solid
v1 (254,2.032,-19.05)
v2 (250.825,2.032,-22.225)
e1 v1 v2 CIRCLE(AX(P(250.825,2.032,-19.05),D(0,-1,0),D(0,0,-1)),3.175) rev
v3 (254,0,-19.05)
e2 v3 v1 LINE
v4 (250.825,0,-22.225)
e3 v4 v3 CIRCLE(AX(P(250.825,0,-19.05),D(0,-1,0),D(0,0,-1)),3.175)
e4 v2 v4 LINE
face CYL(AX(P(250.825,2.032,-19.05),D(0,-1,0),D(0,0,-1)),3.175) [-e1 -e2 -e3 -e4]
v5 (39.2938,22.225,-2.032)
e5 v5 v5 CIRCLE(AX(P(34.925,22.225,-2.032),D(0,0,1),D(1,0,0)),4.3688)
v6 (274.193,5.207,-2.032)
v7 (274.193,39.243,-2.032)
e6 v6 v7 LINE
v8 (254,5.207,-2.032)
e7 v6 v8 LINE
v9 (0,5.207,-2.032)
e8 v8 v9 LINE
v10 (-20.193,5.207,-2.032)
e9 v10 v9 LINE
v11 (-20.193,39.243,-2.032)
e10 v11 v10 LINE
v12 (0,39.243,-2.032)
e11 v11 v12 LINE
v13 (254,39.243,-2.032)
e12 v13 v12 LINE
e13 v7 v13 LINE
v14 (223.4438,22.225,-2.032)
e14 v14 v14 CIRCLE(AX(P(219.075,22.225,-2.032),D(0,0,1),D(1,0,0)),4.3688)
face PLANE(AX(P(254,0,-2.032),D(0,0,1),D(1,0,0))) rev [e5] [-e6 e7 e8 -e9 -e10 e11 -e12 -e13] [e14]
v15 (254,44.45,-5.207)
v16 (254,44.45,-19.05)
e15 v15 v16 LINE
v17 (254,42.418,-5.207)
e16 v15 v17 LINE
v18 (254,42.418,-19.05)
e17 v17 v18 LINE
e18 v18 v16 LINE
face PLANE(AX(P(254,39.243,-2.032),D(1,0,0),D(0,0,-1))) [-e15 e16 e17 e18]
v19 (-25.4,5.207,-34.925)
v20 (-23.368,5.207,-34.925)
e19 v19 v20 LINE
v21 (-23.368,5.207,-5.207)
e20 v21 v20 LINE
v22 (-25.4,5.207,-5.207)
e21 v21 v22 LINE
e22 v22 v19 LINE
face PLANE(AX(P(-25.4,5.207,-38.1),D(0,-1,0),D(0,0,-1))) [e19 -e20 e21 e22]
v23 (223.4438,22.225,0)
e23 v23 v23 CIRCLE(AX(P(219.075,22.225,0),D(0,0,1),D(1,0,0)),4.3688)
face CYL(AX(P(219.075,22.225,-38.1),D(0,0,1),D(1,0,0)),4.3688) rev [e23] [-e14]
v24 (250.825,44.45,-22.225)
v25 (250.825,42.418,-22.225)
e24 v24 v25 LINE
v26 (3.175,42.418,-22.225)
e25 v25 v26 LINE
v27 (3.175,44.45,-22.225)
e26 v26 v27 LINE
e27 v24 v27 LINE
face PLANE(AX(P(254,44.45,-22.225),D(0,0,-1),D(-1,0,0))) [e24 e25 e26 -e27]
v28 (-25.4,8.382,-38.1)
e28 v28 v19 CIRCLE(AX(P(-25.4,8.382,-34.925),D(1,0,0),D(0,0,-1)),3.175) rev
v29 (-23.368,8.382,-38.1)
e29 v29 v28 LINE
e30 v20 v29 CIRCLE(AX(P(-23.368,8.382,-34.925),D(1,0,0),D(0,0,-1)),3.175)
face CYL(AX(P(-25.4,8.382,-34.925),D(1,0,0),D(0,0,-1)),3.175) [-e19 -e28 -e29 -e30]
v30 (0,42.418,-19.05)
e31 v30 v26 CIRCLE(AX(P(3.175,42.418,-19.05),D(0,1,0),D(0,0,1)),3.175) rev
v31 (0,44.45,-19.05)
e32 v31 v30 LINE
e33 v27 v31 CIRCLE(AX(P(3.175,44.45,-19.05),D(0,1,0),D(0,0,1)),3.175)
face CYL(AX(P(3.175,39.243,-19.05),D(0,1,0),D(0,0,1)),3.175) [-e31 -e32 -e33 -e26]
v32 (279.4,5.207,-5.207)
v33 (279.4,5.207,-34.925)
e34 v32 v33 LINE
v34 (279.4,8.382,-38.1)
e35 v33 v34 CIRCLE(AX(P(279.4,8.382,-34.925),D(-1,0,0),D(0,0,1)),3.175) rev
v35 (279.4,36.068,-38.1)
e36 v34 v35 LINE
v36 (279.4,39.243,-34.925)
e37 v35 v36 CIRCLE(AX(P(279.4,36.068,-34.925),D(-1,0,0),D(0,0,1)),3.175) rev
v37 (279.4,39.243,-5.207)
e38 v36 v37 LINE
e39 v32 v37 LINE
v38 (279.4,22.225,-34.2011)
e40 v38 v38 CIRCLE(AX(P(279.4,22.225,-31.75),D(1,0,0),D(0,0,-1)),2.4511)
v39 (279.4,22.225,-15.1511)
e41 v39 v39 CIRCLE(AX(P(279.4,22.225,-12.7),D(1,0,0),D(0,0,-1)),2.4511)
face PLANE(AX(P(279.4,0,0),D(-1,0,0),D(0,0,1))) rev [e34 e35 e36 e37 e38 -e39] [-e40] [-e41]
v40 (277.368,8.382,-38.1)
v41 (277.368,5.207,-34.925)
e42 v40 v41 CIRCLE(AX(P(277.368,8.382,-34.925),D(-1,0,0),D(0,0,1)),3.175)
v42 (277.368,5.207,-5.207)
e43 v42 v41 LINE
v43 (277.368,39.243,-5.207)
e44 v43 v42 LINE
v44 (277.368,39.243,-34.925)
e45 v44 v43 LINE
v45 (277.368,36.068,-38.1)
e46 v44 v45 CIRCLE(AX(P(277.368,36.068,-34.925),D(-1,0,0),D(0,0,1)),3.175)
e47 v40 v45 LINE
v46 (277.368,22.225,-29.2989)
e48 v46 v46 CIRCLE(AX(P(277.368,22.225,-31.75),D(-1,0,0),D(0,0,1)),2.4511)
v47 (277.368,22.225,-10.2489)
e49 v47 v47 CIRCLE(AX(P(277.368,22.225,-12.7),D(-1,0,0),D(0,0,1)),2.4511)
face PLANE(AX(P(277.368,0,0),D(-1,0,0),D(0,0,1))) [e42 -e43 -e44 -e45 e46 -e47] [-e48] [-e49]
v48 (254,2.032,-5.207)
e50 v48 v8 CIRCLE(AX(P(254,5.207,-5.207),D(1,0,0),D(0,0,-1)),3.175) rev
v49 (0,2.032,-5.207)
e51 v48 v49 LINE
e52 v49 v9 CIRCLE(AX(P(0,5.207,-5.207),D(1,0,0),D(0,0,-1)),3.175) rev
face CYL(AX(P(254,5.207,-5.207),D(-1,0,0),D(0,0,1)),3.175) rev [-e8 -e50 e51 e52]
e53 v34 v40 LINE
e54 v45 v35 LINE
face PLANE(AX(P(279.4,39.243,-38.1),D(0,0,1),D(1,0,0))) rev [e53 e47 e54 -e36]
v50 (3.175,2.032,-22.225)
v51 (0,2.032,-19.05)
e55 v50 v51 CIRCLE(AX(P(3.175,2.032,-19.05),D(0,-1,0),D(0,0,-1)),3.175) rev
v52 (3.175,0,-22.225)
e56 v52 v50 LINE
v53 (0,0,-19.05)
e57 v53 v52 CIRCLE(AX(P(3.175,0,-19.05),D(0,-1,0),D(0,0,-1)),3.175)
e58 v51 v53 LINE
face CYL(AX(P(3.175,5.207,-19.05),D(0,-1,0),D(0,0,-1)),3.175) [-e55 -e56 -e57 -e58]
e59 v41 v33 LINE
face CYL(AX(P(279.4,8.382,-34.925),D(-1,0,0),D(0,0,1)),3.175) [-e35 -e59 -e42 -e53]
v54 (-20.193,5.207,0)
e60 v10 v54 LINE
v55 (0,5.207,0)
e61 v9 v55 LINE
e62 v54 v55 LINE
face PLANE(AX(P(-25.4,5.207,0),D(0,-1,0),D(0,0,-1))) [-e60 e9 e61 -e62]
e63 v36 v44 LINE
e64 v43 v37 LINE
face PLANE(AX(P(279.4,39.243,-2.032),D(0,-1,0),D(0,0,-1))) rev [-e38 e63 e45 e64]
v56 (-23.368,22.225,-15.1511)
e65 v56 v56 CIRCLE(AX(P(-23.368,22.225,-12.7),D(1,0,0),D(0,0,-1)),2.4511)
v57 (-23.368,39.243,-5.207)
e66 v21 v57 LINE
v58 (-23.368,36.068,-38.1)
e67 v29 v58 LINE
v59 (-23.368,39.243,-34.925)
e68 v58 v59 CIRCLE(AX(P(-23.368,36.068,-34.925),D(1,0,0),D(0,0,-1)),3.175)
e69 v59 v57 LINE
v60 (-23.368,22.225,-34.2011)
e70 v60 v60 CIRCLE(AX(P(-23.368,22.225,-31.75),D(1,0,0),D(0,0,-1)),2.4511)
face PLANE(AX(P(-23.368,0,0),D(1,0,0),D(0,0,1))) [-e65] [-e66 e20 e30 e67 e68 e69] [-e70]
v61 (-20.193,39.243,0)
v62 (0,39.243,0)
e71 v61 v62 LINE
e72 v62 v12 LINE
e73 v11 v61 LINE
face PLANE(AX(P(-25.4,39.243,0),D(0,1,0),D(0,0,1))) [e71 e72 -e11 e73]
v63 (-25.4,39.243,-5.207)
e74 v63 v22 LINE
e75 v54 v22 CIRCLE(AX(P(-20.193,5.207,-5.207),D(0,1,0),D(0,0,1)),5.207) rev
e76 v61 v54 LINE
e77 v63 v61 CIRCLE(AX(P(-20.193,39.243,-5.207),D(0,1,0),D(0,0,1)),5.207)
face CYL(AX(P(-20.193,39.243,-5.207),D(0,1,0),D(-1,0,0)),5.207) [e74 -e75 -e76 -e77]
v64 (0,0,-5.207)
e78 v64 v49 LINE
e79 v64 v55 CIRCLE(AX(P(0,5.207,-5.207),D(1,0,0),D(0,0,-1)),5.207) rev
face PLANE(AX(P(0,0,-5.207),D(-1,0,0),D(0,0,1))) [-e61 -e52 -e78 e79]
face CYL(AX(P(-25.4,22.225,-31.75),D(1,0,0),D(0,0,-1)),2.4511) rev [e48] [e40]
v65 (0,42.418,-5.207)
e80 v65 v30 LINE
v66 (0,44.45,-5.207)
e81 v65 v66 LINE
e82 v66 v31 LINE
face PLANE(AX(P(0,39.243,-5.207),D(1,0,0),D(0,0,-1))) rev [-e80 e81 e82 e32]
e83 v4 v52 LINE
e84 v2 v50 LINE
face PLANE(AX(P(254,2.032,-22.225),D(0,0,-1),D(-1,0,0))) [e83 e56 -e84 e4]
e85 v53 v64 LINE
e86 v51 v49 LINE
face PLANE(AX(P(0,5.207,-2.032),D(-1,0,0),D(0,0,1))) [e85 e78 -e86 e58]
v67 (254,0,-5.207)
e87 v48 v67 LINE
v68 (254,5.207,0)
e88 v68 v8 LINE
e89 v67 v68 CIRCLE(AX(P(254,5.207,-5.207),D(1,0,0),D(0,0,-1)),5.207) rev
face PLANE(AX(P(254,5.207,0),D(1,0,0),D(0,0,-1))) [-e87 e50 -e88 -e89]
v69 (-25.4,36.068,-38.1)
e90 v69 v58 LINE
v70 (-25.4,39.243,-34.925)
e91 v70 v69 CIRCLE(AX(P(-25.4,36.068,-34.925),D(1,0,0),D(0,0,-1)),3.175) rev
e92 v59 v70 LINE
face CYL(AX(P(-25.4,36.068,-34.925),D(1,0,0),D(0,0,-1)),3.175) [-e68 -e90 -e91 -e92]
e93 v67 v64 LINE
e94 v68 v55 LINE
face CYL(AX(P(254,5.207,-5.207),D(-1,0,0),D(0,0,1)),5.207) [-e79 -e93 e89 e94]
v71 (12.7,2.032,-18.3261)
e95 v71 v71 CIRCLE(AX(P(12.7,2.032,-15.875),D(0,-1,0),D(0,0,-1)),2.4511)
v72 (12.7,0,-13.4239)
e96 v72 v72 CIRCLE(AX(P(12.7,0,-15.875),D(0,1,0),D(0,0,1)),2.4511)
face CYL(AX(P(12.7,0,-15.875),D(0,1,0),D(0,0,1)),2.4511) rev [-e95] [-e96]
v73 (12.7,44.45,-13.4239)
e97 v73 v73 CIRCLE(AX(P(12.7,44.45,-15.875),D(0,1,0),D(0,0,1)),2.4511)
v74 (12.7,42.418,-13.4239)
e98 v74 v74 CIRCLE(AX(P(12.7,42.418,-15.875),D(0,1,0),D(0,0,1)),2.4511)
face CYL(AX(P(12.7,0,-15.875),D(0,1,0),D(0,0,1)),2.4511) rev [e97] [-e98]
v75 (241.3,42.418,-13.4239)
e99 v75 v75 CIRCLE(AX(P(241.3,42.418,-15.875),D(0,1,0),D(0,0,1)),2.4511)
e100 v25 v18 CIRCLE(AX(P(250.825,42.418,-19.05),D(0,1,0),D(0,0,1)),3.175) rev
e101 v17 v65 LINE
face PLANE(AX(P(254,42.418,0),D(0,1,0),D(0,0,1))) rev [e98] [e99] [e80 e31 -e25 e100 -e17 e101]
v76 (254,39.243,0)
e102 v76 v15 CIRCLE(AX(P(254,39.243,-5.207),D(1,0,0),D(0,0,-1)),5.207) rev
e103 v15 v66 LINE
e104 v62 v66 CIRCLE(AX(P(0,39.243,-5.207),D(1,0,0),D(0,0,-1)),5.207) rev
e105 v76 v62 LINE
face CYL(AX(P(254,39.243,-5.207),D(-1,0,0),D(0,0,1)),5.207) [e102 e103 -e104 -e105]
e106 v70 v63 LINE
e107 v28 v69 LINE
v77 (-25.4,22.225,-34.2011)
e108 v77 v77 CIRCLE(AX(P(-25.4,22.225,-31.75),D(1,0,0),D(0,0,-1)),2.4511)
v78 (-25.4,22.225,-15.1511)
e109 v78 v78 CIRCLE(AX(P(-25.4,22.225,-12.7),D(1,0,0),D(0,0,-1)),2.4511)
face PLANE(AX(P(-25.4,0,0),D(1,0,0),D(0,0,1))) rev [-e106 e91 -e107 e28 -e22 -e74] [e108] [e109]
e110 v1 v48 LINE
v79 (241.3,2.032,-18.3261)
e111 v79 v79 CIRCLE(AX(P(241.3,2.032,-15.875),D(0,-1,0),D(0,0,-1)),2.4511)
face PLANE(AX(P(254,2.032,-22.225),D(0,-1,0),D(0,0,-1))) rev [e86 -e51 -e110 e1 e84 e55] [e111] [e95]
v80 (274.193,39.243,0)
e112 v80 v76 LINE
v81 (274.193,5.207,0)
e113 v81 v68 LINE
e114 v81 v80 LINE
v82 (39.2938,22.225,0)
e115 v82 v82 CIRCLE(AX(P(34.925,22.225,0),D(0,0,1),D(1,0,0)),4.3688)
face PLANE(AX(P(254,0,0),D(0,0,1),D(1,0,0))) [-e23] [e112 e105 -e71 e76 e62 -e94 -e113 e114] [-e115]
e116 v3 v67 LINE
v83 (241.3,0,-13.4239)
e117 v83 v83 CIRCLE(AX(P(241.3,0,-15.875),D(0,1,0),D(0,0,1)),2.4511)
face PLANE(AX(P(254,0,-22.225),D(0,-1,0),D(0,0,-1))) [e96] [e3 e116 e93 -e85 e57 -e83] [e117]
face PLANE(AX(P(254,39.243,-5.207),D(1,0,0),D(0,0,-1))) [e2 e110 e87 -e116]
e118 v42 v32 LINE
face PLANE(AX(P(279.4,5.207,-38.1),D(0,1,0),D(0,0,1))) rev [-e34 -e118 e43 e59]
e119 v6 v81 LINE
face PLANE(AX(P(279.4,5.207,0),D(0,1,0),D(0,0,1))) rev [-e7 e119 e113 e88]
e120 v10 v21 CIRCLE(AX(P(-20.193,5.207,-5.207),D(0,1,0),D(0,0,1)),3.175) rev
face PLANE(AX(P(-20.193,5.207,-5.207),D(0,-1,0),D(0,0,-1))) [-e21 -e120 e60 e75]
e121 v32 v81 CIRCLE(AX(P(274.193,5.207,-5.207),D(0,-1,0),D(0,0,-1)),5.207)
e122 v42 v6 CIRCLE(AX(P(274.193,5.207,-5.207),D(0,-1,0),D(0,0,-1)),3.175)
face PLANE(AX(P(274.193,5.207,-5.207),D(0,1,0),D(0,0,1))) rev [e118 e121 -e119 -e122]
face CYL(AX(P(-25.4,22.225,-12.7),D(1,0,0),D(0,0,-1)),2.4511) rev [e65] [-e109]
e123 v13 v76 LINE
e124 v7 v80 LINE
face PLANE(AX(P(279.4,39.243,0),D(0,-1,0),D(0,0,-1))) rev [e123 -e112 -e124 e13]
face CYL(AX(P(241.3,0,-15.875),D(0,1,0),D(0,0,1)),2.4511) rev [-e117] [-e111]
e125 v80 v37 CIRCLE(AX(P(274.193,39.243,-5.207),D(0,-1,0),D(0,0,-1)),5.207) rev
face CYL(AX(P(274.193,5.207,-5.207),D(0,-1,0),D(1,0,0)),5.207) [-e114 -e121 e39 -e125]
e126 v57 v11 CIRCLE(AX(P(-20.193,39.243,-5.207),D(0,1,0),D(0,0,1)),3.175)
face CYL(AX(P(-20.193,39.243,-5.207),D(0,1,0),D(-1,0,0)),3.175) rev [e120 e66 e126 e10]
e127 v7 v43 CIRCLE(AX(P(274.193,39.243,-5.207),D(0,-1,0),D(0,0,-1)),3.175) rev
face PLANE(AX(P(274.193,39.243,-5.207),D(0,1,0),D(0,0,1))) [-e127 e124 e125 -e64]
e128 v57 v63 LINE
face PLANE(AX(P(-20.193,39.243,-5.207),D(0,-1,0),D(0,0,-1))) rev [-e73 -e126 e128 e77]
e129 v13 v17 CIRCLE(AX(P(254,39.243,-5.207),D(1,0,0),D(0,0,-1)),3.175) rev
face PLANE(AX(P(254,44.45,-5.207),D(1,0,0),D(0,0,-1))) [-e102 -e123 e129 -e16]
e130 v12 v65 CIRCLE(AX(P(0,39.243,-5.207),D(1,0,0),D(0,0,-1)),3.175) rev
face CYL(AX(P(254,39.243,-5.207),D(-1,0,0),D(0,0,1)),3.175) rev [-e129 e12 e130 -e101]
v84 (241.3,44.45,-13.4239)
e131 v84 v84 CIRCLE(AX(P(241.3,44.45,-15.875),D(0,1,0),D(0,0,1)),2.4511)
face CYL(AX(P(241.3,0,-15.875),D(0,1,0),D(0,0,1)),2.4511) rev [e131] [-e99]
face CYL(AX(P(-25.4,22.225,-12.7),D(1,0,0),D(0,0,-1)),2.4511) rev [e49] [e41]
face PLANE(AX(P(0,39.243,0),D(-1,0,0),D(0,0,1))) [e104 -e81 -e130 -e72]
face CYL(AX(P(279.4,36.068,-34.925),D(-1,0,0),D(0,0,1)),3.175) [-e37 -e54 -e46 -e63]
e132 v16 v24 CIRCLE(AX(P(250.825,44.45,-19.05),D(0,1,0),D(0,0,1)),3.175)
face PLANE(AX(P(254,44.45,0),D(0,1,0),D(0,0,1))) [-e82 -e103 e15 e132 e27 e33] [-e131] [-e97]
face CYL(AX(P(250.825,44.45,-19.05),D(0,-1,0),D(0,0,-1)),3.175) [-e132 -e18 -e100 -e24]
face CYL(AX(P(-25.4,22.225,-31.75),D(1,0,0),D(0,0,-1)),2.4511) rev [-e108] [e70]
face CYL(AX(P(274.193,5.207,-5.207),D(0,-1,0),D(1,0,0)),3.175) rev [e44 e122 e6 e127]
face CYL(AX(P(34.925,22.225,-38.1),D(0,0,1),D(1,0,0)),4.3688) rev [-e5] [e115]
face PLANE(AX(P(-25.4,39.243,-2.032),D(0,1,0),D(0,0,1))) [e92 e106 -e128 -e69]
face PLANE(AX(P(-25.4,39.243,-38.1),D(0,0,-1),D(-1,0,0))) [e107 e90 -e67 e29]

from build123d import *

# Parameters (mm, degrees)
BASE_FLANGE1_DEPTH           = 254
SKETCH6_W                    = 2.032
SKETCH6_H                    = 34.036
BOSS_EXTRUDE1_DEPTH          = 25.4
EDGE_FLANGE1_STRIP_W         = 14.478
EDGE_FLANGE1_STRIP_H         = 2.032
EDGE_FLANGE1_STRIP_CUT_DEPTH = 34.036
EDGE_FLANGE1_DEPTH           = 34.036
SKETCH10_R                   = 2.4511
CUT_EXTRUDE1_DEPTH           = 311.37147501
SKETCH11_R                   = 2.4511
CUT_EXTRUDE2_DEPTH           = 286.467638271
SKETCH12_R                   = 4.3688
CUT_EXTRUDE3_DEPTH           = 286.467638271
FILLET1_R                    = 3.175


# Sheet-metal steps are written as plain solids
with BuildPart() as part:
    # Sketch1 → Base-Flange1 (new body)
    with BuildSketch(Plane(origin=(0, 0, 0), x_dir=(0, 0, -1), z_dir=(1, 0, 0))):
        with BuildLine():
            Line((22.225, 0), (5.207, 0))
            ThreePointArc((5.207, 0), (1.52509499, 1.52509499), (0, 5.207))
            Line((0, 5.207), (0, 39.243))
            ThreePointArc((0, 39.243), (1.52509499, 42.92490501), (5.207, 44.45))
            Line((5.207, 44.45), (22.225, 44.45))
            Line((22.225, 44.45), (22.225, 42.418))
            Line((22.225, 42.418), (5.207, 42.418))
            ThreePointArc((5.207, 42.418), (2.96193597, 41.48806403), (2.032, 39.243))
            Line((2.032, 39.243), (2.032, 5.207))
            ThreePointArc((2.032, 5.207), (2.96193597, 2.96193597), (5.207, 2.032))
            Line((5.207, 2.032), (22.225, 2.032))
            Line((22.225, 2.032), (22.225, 0))
        make_face()
    extrude(amount=BASE_FLANGE1_DEPTH)

    # Sketch6 → Boss-Extrude1 (add)
    with BuildSketch(Plane(origin=(254, 0, 0), x_dir=(0, 0, -1), z_dir=(1, 0, 0))):
        with Locations((1.016, 22.225)):
            Rectangle(SKETCH6_W, SKETCH6_H)
    boss_extrude1 = extrude(amount=BOSS_EXTRUDE1_DEPTH)

    # Edge-Flange1 strip (across the edge) → Edge-Flange1 strip cut (cut)
    with BuildSketch(Plane(origin=(279.4, 39.243, -2.032), x_dir=(-1, 0, 0), z_dir=(0, -1, 0))):
        with Locations((-2.032, -1.016)):
            Rectangle(EDGE_FLANGE1_STRIP_W, EDGE_FLANGE1_STRIP_H)
    edge_flange1_strip_cut = extrude(amount=EDGE_FLANGE1_STRIP_CUT_DEPTH, mode=Mode.SUBTRACT)

    # Edge-Flange1 section (across the edge) → Edge-Flange1 (add)
    with BuildSketch(Plane(origin=(279.4, 39.243, -2.032), x_dir=(-1, 0, 0), z_dir=(0, -1, 0))):
        with BuildLine():
            Line((0, 3.175), (0, 36.068))
            Line((0, 36.068), (2.032, 36.068))
            Line((2.032, 36.068), (2.032, 3.175))
            ThreePointArc((2.032, 3.175), (2.96193597, 0.92993597), (5.207, 0))
            Line((5.207, 0), (5.207, -2.032))
            ThreePointArc((5.207, -2.032), (1.52509499, -0.50690501), (0, 3.175))
        make_face()
    edge_flange1 = extrude(amount=EDGE_FLANGE1_DEPTH)

    # Mirror1: Boss-Extrude1, Edge-Flange1 strip cut, Edge-Flange1 across plane
    add(boss_extrude1.mirror(Plane(origin=(127, 0, 0), x_dir=(0, 0, 1), z_dir=(1, 0, 0))))
    add(edge_flange1_strip_cut.mirror(Plane(origin=(127, 0, 0), x_dir=(0, 0, 1), z_dir=(1, 0, 0))), mode=Mode.SUBTRACT)
    add(edge_flange1.mirror(Plane(origin=(127, 0, 0), x_dir=(0, 0, 1), z_dir=(1, 0, 0))))

    # Sketch10 → Cut-Extrude1 (cut, through all)
    with BuildSketch(Plane(origin=(279.4, 0, 0), x_dir=(0, 0, -1), z_dir=(1, 0, 0))):
        with Locations((12.7, 22.225)):
            Circle(SKETCH10_R)
        with Locations((31.75, 22.225)):
            Circle(SKETCH10_R)
    extrude(amount=-CUT_EXTRUDE1_DEPTH, mode=Mode.SUBTRACT)

    # Sketch11 → Cut-Extrude2 (cut, through all)
    with BuildSketch(Plane(origin=(0, 44.45, 0), x_dir=(1, 0, 0), z_dir=(0, 1, 0))):
        with Locations(Location((12.7, 15.875, 0), (0, 0, 270))):
            Circle(SKETCH11_R)
        with Locations(Location((241.3, 15.875, 0), (0, 0, 270))):
            Circle(SKETCH11_R)
    extrude(amount=-CUT_EXTRUDE2_DEPTH, mode=Mode.SUBTRACT)

    # Sketch12 → Cut-Extrude3 (cut, through all)
    with BuildSketch(Plane.XY):
        with Locations((34.925, 22.225)):
            Circle(SKETCH12_R)
        with Locations((219.075, 22.225)):
            Circle(SKETCH12_R)
    extrude(amount=-CUT_EXTRUDE3_DEPTH, mode=Mode.SUBTRACT)

    # Fillet1
    fillet1_edges = [part.edges().sort_by_distance(p)[0] for p in [
        (-24.384, 5.207, -38.1),
        (0, 1.016, -22.225),
        (-24.384, 39.243, -38.1),
        (0, 43.434, -22.225),
        (254, 1.016, -22.225),
        (278.384, 39.243, -38.1),
        (278.384, 5.207, -38.1),
        (254, 43.434, -22.225),
    ]]
    fillet(fillet1_edges, radius=FILLET1_R)


solid = part.part
